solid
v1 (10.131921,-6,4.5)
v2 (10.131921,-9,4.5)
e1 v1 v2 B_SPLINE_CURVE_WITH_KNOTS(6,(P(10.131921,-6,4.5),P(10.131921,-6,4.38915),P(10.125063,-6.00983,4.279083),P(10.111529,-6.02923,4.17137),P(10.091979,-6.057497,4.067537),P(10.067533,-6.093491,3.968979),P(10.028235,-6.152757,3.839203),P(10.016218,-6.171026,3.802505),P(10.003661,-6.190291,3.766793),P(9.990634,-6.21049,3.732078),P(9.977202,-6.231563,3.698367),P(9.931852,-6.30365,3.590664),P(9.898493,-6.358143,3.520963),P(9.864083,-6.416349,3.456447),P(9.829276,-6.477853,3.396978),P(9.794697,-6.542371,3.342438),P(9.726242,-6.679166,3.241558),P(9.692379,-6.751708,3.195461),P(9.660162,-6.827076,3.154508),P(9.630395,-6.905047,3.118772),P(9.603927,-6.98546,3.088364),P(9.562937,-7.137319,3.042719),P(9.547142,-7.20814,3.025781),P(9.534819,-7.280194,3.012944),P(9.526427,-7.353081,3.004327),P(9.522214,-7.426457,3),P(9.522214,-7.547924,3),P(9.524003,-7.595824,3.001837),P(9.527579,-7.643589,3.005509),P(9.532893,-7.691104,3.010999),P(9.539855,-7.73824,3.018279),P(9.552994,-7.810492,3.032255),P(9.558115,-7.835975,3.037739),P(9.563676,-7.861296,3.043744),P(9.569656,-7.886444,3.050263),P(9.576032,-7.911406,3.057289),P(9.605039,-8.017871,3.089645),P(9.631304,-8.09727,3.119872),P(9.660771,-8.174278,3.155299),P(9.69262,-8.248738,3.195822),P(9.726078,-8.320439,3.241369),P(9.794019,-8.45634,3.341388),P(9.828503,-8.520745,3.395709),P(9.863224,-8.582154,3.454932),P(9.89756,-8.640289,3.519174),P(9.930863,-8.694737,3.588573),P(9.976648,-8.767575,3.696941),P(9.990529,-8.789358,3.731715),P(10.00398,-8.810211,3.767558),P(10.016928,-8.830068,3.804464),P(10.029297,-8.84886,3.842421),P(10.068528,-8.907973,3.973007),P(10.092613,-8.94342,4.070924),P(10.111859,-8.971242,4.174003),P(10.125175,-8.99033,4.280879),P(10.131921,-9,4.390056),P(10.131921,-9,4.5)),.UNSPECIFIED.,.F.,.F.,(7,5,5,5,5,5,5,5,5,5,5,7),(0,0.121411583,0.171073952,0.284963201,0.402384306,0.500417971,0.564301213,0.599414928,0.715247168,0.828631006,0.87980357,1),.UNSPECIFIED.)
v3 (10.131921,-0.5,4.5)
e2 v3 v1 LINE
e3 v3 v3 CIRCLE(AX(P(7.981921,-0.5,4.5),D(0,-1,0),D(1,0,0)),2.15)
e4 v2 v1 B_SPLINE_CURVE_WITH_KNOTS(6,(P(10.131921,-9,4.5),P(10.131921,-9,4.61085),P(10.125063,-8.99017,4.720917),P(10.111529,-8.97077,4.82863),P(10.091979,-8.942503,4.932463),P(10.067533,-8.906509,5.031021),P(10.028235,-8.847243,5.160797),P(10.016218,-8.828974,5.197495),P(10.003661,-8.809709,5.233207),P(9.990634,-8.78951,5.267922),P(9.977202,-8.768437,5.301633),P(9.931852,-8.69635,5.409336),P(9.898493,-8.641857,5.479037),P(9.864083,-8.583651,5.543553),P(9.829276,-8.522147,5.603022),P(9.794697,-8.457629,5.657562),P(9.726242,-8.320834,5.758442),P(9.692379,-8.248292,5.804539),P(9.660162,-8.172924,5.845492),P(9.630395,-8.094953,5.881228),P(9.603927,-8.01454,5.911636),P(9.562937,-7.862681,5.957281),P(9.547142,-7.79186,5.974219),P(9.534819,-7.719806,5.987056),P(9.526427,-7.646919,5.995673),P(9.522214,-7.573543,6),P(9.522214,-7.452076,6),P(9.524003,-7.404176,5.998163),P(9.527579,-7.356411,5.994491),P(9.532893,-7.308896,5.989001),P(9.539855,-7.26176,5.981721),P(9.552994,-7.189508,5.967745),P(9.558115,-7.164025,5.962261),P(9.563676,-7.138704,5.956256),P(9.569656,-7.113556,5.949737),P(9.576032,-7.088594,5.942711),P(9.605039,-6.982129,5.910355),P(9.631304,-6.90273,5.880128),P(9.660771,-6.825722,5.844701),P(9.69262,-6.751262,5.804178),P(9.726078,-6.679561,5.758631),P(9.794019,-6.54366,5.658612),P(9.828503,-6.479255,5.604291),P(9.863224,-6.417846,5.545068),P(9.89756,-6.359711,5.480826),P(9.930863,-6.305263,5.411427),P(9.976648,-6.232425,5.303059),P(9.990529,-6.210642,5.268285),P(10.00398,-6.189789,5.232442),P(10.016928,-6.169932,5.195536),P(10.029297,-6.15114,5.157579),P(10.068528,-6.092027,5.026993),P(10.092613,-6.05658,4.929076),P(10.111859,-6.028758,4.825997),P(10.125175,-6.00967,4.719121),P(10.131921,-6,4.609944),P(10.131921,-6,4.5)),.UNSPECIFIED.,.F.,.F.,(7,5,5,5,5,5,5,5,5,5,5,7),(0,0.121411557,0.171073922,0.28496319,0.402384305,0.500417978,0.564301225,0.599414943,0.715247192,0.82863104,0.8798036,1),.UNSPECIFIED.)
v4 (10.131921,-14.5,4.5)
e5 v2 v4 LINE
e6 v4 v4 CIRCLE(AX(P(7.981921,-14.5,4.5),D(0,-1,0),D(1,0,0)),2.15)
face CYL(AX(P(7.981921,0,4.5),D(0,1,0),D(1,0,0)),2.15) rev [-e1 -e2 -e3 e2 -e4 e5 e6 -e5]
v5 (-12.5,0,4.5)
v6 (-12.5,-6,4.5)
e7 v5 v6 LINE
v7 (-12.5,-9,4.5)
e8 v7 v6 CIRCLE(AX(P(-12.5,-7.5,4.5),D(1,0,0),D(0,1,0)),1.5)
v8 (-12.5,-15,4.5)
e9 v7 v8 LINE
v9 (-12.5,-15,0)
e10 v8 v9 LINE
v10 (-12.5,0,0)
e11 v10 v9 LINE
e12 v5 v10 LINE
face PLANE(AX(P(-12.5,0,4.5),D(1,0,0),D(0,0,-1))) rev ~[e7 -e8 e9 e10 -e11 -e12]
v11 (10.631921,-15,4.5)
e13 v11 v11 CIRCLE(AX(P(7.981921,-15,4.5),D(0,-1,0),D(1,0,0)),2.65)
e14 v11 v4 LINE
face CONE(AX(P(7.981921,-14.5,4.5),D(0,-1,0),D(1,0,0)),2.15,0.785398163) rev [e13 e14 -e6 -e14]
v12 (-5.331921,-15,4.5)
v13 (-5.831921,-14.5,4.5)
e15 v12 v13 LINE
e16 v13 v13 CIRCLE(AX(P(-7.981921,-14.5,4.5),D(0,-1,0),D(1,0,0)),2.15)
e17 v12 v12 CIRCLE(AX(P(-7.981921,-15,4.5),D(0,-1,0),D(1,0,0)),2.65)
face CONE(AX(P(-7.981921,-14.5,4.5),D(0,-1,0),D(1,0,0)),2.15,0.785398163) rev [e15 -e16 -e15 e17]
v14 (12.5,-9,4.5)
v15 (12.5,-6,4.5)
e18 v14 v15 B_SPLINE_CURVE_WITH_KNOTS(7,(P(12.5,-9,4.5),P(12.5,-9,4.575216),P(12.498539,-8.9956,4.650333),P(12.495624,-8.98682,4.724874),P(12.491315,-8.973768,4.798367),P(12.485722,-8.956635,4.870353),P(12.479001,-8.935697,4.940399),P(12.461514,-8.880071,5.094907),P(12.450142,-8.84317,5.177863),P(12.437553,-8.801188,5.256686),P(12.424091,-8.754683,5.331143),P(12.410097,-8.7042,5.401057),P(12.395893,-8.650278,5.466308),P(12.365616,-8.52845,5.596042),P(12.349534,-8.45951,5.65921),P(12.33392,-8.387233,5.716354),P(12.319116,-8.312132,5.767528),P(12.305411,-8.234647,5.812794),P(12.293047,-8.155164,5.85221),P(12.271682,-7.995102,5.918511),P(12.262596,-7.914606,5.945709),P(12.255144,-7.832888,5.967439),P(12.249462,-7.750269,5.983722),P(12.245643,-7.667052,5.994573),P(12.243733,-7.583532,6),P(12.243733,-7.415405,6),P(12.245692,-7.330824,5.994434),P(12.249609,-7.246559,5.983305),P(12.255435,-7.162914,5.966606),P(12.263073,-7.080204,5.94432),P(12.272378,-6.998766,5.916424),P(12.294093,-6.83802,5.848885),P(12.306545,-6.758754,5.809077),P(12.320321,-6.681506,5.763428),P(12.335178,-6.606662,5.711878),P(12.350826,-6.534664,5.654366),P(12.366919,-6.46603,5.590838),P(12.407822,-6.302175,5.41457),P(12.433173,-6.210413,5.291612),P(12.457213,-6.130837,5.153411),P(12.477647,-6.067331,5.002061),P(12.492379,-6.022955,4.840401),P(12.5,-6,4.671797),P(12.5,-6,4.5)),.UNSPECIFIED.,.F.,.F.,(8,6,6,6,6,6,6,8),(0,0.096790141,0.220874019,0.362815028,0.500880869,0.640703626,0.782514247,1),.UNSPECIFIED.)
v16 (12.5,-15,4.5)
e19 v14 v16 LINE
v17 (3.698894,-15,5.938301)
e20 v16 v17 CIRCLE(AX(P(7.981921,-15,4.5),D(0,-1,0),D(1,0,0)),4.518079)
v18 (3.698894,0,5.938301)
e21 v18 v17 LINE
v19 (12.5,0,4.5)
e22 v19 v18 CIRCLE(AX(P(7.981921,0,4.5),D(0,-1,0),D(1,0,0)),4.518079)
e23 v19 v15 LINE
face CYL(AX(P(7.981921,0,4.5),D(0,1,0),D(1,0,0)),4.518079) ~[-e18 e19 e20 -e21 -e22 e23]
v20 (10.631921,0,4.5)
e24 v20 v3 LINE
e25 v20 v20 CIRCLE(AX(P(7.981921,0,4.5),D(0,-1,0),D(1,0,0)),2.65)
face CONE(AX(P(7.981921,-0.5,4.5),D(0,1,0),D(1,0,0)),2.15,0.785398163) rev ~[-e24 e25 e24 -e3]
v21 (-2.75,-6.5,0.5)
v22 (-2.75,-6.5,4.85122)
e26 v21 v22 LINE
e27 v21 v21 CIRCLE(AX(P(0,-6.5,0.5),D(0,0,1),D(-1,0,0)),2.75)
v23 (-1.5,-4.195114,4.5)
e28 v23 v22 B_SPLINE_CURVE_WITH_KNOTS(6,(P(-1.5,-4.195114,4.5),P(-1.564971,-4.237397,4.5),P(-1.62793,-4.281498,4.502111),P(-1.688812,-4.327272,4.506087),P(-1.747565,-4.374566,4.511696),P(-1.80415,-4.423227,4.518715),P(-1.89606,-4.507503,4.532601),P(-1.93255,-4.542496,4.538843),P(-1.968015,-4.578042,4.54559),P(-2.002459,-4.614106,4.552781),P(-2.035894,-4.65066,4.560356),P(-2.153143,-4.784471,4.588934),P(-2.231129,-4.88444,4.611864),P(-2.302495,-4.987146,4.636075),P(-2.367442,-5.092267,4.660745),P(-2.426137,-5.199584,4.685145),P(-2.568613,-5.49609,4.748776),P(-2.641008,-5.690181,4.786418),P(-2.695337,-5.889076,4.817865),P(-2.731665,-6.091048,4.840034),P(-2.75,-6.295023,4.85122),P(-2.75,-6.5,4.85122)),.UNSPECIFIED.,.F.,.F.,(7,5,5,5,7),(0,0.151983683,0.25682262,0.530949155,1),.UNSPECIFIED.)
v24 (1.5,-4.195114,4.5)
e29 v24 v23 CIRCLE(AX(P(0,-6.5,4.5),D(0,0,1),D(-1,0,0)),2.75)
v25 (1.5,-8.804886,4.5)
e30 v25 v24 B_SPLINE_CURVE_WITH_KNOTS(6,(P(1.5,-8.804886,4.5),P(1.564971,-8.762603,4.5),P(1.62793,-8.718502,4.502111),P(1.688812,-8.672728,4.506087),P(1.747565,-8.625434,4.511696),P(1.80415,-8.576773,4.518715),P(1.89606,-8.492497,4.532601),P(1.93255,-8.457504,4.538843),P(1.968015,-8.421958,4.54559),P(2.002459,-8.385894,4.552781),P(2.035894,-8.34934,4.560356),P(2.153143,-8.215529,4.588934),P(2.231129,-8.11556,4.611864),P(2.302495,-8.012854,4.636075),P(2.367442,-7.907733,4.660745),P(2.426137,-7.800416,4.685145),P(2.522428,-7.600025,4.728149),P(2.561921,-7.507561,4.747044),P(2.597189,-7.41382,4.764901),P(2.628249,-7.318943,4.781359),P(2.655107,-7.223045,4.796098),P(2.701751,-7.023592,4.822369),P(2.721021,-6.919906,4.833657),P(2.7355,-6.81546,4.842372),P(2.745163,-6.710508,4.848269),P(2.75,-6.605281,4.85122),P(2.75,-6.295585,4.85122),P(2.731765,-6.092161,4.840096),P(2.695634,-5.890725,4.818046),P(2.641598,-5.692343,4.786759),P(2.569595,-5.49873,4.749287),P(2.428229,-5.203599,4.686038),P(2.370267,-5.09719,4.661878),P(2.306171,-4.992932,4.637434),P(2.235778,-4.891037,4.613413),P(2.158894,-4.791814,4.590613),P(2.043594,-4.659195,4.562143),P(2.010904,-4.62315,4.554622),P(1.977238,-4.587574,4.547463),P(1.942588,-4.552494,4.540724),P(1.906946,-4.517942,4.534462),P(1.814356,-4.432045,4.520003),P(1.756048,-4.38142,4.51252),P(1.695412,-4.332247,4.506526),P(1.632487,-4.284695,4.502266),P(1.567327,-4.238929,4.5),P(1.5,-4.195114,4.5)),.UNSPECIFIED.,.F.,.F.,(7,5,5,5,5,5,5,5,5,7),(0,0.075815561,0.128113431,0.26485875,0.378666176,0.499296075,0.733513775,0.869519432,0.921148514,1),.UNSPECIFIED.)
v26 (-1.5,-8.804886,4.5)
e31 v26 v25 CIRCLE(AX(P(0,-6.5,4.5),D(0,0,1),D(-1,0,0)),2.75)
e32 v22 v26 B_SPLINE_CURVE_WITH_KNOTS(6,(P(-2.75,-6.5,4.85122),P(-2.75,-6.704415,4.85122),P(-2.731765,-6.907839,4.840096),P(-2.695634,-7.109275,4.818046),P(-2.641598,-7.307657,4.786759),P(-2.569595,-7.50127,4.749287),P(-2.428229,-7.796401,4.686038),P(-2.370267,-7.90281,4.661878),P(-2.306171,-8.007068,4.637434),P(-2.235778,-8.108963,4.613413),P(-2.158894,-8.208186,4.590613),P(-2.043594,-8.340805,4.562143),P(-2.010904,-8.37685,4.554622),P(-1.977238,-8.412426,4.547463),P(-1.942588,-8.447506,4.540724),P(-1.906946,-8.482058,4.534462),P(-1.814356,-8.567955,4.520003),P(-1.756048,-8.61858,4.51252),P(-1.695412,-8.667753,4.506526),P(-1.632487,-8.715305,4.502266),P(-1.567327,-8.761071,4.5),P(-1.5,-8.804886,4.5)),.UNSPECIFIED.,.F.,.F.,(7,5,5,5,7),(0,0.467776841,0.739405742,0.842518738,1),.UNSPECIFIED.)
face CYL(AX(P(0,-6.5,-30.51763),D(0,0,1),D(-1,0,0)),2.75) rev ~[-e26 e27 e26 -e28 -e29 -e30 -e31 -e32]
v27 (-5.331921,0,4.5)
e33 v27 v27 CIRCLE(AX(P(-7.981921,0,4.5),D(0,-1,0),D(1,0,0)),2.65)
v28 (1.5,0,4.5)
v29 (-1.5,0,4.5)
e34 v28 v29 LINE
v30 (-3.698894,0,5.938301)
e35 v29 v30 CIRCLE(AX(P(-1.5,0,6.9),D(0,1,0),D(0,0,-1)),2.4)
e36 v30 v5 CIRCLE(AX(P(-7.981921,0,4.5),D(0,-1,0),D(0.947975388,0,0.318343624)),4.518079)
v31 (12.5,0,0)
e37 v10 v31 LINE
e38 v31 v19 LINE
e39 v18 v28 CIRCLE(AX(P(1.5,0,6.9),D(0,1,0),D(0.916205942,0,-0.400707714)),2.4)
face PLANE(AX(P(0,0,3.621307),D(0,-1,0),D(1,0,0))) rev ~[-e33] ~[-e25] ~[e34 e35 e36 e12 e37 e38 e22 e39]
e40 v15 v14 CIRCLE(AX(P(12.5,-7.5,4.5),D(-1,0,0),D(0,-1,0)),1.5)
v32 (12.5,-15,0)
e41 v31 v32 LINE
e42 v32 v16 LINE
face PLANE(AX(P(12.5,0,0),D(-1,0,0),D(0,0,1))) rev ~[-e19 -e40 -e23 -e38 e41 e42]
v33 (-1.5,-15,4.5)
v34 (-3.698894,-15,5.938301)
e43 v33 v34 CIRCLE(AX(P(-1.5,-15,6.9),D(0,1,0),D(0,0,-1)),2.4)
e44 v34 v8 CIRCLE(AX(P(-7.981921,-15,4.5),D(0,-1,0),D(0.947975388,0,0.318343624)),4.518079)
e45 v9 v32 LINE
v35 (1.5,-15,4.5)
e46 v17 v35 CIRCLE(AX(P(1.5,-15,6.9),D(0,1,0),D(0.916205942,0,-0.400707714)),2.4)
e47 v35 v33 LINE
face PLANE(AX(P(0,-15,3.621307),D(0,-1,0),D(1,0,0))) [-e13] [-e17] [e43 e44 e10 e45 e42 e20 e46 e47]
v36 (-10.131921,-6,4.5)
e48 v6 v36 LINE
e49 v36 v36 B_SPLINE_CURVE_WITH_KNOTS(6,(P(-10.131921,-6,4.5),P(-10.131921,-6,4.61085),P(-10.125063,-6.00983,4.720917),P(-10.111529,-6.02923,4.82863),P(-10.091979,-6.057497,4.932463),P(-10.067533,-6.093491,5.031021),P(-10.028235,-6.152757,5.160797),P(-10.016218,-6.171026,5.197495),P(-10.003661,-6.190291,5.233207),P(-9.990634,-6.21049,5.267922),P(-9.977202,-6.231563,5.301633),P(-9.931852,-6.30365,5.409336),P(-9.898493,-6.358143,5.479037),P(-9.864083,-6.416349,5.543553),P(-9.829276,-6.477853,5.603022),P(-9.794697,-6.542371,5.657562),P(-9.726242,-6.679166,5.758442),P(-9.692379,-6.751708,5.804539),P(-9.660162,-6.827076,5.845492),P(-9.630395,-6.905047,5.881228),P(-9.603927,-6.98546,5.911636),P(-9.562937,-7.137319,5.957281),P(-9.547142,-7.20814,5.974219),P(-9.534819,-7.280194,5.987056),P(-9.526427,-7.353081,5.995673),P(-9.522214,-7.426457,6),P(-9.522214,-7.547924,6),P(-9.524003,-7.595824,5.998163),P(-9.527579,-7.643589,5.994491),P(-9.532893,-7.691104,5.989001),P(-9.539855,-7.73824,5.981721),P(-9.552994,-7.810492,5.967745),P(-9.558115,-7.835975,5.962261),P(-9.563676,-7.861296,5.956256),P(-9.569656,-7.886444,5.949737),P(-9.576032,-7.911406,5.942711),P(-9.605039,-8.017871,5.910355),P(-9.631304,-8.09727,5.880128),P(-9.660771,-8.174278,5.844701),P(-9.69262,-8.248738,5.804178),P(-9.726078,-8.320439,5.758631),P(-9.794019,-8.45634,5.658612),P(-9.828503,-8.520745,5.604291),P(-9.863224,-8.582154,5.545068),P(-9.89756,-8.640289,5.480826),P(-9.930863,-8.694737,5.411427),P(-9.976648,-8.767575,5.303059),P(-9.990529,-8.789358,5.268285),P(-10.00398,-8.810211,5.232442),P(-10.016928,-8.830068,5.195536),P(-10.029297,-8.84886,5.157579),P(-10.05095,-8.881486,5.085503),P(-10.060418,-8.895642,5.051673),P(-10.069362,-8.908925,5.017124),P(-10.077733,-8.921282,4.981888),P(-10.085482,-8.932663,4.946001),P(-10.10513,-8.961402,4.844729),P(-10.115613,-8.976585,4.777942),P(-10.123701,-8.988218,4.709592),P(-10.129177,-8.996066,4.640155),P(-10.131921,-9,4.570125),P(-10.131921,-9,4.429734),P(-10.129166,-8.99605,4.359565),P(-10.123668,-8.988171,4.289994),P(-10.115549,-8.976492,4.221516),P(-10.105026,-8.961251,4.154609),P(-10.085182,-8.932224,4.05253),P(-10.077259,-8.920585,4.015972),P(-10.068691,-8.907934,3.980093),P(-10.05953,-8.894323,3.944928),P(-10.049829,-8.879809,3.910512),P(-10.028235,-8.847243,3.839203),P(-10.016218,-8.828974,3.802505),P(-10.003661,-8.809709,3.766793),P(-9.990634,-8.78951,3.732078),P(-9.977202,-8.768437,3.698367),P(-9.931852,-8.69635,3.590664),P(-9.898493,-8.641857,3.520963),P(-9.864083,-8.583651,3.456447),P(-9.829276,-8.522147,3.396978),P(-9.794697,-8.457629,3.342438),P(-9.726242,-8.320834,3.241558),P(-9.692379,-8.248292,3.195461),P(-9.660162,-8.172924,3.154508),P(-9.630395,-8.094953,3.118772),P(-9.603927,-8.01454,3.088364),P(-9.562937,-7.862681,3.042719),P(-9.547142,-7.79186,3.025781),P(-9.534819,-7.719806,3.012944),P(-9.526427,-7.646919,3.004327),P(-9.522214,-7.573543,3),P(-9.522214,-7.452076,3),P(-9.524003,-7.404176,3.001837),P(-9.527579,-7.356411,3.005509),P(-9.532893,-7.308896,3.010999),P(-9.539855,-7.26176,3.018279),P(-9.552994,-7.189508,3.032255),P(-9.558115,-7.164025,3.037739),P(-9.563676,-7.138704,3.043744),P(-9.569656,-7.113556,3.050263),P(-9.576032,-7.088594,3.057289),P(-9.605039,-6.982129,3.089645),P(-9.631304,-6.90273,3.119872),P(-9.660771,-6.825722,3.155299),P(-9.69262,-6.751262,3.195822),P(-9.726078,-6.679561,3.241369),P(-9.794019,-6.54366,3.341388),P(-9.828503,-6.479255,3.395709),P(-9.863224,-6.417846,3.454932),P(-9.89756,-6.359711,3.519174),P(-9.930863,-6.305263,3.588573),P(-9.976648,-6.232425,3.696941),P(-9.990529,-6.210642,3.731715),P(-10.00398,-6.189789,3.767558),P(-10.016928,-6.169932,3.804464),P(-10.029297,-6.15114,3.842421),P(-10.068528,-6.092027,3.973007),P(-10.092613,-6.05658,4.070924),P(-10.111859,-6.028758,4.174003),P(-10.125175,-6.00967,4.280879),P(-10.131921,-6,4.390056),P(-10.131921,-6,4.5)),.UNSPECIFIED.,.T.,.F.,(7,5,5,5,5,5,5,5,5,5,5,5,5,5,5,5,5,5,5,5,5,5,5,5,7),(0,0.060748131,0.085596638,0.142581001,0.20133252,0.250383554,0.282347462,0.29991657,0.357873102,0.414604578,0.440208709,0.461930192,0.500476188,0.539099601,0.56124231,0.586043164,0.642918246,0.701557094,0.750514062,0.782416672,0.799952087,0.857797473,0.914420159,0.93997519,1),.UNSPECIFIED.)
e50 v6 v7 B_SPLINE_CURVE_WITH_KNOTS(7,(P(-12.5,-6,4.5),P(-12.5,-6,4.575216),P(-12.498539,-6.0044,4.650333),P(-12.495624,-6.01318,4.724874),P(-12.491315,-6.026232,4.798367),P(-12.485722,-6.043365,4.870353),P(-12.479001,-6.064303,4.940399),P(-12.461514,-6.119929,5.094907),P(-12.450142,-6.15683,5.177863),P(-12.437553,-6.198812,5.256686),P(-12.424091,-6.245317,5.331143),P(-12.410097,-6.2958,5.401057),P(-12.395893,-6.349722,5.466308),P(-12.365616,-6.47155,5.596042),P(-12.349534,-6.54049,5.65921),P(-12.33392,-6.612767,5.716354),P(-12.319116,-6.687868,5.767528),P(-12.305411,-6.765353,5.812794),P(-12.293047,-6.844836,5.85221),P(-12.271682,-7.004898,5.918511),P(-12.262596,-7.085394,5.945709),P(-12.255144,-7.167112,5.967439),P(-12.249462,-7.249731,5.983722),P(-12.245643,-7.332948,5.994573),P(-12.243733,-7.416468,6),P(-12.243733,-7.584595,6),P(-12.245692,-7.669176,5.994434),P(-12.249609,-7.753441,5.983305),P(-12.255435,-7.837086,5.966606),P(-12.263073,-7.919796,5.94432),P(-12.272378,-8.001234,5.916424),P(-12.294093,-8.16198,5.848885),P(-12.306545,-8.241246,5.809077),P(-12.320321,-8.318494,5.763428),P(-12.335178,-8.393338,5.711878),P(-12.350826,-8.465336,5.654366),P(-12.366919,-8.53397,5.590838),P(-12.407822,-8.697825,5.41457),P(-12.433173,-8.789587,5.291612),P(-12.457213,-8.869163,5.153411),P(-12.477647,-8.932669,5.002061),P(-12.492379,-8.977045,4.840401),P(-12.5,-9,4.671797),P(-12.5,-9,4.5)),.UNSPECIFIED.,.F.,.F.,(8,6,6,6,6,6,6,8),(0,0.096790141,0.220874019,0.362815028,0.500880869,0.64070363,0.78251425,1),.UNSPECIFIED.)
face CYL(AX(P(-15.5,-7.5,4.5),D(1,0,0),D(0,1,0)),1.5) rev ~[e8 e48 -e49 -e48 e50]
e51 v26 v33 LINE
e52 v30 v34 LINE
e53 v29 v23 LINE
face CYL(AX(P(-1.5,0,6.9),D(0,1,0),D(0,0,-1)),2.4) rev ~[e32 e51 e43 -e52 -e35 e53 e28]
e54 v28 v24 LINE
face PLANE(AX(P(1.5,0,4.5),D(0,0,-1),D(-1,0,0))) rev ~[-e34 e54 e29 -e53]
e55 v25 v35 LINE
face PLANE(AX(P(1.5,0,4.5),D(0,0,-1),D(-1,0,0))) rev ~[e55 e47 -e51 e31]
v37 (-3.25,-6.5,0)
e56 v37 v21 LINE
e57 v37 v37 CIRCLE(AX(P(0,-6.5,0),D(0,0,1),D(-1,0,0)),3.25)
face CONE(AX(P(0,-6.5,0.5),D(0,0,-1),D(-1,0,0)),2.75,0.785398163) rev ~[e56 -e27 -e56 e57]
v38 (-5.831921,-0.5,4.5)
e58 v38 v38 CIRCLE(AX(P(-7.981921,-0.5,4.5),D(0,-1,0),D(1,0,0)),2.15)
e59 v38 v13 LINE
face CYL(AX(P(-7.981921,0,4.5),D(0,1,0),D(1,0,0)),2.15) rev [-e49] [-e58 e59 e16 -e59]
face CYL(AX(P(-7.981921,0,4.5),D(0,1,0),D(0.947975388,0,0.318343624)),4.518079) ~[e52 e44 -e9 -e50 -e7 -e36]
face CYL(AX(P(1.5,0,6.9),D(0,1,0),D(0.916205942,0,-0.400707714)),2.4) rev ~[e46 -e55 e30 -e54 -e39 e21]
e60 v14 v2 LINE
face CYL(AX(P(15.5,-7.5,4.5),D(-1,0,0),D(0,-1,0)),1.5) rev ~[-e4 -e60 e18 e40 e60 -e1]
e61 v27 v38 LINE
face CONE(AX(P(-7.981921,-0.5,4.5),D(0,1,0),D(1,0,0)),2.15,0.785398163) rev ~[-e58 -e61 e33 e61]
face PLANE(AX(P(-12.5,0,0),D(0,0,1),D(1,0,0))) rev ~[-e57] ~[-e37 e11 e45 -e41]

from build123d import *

# Parameters (mm, degrees)
F0_R     = 2.15
F1_DEPTH = 15
F3_D     = 5.5
F4_SIZE  = 0.5
F6_D     = 3
F6_DEPTH = 3
F6_TIP   = 0.9012909285
F8_D     = 3
F8_DEPTH = 3
F8_TIP   = 0.9012909285


with BuildPart() as f1:
    # F0 (on Front) → F1 (new body)
    with BuildSketch(Plane.XZ):
        with BuildLine():
            Line((-12.5, 4.5), (-12.5, 0))
            Line((-12.5, 0), (0, 0))
            Line((0, 0), (12.5, 0))
            Line((12.5, 0), (12.5, 4.5))
            ThreePointArc((12.5, 4.5), (8.7106121428, 8.9589284982), (3.6988942602, 5.9383014856))
            ThreePointArc((3.6988942602, 5.9383014856), (2.8137586471, 4.8915084722), (1.5, 4.5))
            Line((1.5, 4.5), (0, 4.5))
            Line((0, 4.5), (-1.5, 4.5))
            ThreePointArc((-1.5, 4.5), (-2.8137586471, 4.8915084722), (-3.6988942602, 5.9383014856))
            ThreePointArc((-3.6988942602, 5.9383014856), (-8.7106121428, 8.9589284982), (-12.5, 4.5))
        make_face()
        with Locations((-7.9819214904, 4.5)):
            Circle(F0_R, mode=Mode.SUBTRACT)
        with Locations((7.9819214904, 4.5)):
            Circle(F0_R, mode=Mode.SUBTRACT)
    extrude(amount=F1_DEPTH)

    # F3 (through all)
    with Locations(Plane(origin=(0, 0, 0), x_dir=(1, 0, 0), z_dir=(0, 0, -1))):
        with Locations((0, 6.5)):
            Hole(F3_D / 2)

    # F4
    f4_edges = [f1.edges().sort_by_distance(p)[0] for p in [
        (-10.131921, 0, 4.5),
        (5.831921, 0, 4.5),
        (-10.131921, -15, 4.5),
        (5.831921, -15, 4.5),
        (-2.75, -6.5, 0),
    ]]
    chamfer(f4_edges, length=F4_SIZE)

    # F6
    with Locations(Plane(origin=(-12.5, 0, 0), x_dir=(0, -1, 0), z_dir=(-1, 0, 0))):
        with Locations((7.5, 4.5)):
            Hole(F6_D / 2, depth=F6_DEPTH)
            with Locations((0, 0, -(F6_DEPTH + F6_TIP / 2))):  # 118° drill point
                Cone(0, F6_D / 2, F6_TIP, mode=Mode.SUBTRACT)

    # F8
    with Locations(Plane.YZ.offset(12.5)):
        with Locations((-7.5, 4.5)):
            Hole(F8_D / 2, depth=F8_DEPTH)
            with Locations((0, 0, -(F8_DEPTH + F8_TIP / 2))):  # 118° drill point
                Cone(0, F8_D / 2, F8_TIP, mode=Mode.SUBTRACT)


solid = f1.part
